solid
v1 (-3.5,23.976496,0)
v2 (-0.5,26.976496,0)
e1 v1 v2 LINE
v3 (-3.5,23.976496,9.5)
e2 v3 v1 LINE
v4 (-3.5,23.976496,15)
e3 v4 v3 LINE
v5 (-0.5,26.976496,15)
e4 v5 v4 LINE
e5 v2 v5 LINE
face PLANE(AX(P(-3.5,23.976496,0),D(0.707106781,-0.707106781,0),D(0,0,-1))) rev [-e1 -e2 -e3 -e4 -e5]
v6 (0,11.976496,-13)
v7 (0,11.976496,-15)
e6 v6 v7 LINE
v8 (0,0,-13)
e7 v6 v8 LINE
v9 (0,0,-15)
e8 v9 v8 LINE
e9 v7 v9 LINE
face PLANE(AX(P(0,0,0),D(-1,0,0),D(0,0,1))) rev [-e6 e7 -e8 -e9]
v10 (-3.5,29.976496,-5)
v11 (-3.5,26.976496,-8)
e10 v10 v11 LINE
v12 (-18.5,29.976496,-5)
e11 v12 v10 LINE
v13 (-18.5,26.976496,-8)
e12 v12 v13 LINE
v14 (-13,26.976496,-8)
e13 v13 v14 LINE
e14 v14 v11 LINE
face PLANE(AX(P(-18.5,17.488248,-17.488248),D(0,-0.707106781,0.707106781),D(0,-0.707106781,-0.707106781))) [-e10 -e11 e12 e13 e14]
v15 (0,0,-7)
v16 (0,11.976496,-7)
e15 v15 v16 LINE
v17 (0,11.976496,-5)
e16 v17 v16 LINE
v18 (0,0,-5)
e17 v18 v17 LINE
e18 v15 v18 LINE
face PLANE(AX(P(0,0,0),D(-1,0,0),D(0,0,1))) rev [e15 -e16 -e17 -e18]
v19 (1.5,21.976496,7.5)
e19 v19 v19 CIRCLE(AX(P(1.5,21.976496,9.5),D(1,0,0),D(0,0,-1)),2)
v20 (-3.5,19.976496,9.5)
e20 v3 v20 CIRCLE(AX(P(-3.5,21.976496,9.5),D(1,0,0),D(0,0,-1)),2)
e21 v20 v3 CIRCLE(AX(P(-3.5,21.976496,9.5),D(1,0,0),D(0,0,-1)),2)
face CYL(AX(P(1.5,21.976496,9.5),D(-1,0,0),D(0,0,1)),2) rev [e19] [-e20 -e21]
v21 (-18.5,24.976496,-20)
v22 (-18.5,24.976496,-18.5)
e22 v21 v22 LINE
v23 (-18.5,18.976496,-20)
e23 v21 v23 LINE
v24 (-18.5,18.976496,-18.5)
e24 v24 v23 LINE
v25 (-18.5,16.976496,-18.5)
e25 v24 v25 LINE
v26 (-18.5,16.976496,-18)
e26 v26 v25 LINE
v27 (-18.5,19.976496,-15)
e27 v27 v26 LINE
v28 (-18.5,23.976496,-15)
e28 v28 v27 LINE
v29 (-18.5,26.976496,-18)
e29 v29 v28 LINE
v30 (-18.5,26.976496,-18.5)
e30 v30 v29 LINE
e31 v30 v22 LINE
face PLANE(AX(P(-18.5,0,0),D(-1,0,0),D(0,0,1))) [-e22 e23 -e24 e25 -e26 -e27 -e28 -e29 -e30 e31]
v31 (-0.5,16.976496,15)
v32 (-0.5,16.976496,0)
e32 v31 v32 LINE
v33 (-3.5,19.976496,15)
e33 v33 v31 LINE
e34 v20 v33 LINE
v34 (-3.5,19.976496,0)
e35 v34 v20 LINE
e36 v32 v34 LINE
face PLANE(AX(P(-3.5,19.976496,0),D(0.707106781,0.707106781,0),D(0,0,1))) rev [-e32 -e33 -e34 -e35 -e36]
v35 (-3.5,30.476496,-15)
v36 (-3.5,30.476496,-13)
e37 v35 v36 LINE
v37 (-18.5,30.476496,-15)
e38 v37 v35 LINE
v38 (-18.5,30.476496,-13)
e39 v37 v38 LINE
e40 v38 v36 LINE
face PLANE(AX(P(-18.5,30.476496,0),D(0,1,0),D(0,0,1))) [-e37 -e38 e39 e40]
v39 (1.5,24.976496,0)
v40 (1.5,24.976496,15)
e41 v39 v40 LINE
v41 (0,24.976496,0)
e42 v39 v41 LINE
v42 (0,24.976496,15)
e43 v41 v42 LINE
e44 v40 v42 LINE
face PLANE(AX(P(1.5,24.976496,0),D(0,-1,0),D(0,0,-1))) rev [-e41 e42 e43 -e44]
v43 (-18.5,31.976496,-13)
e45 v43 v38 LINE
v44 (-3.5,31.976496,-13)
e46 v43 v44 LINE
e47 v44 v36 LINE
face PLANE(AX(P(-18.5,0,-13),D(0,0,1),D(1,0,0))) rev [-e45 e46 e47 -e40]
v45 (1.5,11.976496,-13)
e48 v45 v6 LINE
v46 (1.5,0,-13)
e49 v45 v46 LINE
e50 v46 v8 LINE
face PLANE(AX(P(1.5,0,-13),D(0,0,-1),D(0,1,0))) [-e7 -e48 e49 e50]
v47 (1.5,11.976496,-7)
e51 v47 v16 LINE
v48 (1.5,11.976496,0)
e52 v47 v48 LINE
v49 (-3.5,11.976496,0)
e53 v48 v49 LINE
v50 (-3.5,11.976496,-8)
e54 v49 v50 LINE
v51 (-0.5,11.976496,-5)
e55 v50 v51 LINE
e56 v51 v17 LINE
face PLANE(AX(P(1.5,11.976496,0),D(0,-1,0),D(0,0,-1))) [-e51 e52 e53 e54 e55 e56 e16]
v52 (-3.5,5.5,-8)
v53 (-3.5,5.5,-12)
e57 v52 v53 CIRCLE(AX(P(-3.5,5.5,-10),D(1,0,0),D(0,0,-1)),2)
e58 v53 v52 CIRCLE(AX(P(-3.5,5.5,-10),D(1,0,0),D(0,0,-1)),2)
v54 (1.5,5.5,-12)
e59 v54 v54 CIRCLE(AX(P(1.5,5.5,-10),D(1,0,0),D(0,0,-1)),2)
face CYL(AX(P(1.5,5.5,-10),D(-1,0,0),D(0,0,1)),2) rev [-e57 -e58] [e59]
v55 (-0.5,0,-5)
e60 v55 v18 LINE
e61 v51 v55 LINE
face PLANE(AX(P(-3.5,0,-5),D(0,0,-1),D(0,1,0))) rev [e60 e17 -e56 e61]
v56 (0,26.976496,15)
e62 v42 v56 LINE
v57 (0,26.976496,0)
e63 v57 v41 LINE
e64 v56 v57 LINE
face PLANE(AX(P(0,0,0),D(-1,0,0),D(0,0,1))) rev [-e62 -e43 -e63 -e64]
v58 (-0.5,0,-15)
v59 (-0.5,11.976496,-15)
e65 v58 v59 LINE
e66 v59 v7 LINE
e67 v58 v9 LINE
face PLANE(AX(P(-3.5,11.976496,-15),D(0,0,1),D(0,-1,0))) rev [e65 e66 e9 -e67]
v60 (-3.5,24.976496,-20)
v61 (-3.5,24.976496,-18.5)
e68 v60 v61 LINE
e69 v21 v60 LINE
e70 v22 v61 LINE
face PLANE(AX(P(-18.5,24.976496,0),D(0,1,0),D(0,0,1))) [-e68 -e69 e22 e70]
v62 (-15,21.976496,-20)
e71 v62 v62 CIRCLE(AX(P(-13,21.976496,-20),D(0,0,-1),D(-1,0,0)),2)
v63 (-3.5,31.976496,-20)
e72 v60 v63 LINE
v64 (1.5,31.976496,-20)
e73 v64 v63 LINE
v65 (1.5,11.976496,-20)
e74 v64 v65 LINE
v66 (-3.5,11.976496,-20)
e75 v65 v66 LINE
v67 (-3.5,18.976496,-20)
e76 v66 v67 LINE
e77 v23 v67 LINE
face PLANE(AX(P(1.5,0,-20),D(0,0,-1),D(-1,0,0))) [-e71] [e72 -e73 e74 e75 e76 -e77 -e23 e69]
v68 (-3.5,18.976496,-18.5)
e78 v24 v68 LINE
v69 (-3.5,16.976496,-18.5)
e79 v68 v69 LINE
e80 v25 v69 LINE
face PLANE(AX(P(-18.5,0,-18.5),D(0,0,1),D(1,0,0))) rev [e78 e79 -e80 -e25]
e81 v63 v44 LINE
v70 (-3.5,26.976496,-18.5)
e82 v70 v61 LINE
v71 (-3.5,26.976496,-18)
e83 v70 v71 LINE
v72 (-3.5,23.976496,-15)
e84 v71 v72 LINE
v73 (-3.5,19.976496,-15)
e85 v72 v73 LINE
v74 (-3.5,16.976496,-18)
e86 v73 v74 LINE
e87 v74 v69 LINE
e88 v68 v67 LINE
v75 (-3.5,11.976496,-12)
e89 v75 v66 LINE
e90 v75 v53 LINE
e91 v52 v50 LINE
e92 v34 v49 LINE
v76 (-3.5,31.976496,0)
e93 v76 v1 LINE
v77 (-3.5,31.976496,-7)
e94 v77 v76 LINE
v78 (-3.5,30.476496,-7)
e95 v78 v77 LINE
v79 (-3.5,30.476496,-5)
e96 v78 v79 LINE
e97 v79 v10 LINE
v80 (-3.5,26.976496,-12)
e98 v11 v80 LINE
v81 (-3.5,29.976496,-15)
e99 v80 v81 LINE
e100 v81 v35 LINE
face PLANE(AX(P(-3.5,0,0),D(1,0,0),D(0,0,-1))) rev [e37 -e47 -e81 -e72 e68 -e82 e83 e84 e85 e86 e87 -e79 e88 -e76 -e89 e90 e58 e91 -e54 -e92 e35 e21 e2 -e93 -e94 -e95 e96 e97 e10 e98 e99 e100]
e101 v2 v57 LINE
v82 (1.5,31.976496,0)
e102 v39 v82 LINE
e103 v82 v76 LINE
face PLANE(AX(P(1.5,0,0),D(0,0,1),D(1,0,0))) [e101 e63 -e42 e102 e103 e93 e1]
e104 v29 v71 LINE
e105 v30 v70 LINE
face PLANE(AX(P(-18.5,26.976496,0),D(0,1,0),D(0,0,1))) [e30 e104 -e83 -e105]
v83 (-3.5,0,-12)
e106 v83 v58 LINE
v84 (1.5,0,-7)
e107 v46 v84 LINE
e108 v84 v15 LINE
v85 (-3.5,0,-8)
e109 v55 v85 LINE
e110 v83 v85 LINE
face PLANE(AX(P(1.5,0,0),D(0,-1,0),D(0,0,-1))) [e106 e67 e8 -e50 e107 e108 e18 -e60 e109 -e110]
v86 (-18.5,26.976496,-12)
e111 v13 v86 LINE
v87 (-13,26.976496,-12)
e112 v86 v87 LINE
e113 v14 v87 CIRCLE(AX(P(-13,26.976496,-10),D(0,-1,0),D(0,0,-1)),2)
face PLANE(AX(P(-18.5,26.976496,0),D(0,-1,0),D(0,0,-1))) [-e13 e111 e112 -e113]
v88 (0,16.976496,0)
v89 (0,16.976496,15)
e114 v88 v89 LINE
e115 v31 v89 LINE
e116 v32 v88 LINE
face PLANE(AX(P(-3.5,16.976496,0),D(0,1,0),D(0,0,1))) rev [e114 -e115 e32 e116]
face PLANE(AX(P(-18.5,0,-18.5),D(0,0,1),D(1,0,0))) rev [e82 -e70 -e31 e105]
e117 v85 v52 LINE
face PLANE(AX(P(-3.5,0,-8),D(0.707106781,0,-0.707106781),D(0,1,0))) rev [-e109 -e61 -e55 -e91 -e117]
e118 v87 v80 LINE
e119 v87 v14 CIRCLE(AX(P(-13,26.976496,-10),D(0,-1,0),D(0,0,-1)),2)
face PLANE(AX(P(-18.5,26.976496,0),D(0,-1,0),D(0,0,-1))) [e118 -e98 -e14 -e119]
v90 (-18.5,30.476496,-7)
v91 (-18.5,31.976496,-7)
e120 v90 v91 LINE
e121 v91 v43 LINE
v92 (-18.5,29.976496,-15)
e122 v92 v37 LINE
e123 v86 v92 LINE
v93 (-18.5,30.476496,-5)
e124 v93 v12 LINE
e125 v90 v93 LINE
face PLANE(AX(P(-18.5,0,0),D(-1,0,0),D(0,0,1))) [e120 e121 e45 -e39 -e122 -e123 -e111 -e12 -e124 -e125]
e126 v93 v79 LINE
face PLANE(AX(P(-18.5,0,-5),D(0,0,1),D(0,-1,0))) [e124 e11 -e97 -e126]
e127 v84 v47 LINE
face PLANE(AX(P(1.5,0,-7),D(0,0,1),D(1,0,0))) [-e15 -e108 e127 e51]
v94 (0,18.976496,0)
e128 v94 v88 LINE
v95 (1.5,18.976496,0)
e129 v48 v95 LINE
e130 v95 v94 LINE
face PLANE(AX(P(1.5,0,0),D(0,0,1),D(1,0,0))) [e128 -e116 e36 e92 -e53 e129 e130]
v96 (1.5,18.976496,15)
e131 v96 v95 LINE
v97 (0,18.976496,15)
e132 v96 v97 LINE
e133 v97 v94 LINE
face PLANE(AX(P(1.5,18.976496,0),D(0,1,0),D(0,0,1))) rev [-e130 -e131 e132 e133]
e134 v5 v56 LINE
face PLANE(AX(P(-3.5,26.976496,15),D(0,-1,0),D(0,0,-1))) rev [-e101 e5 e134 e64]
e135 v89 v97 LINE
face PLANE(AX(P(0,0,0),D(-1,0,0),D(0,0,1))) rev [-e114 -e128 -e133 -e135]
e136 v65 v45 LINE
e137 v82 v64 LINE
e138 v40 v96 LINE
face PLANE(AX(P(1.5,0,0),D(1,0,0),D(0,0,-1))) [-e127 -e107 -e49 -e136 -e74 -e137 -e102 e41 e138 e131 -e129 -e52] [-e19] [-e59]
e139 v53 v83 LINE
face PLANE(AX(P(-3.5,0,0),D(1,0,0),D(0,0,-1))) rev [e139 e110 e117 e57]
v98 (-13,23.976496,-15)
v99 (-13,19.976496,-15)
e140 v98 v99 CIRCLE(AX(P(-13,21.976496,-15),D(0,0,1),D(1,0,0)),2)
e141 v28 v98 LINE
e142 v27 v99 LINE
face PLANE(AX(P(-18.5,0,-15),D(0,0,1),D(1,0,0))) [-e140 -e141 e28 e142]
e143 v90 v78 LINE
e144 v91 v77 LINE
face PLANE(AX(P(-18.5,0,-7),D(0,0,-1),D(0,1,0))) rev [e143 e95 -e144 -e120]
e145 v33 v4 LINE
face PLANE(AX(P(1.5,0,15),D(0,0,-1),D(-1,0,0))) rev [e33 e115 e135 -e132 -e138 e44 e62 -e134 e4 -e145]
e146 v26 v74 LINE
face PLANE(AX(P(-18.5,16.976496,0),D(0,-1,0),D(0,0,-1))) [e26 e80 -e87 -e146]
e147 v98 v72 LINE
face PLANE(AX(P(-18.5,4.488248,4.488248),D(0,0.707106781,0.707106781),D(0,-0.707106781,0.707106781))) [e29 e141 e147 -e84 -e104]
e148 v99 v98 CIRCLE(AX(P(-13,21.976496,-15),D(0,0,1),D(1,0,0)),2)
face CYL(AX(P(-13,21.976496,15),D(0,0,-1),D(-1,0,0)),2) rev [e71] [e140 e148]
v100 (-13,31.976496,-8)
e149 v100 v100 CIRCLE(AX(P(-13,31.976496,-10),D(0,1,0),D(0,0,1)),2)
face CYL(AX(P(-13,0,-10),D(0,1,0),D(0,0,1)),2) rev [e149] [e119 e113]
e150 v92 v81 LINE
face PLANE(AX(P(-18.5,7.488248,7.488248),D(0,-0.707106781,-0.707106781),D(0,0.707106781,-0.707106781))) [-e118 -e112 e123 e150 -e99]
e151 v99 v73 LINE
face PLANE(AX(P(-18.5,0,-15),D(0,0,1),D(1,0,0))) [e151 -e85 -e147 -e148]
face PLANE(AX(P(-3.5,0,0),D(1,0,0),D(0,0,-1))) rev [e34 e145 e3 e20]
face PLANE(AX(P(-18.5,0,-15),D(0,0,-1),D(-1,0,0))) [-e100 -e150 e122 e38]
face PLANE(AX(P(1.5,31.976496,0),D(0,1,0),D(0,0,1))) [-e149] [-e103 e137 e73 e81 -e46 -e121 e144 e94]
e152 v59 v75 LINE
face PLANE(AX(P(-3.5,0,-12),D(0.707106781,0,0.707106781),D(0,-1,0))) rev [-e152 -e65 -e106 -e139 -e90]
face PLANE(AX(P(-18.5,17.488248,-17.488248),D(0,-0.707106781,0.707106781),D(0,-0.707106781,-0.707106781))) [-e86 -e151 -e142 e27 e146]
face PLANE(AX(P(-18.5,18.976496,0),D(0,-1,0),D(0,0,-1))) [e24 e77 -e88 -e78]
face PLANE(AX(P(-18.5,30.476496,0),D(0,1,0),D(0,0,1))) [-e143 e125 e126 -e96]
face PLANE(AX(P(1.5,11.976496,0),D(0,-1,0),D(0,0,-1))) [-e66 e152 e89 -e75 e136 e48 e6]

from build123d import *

# Parameters (mm, degrees)
SKETCH1_W               = 20
SKETCH1_H               = 20
SKETCH1_W_2             = 15
SKETCH1_H_2             = 6
SKETCH1_R               = 2
SKETCH1_W_3             = 6
SKETCH1_H_3             = 11.976495928
BOSS_EXTRUDE2_DEPTH     = 1.5
BOSS_EXTRUDE3_DEPTH     = 3.5
SKETCH3_W               = 10
SKETCH3_H               = 11.976495928
SKETCH3_W_2             = 15
SKETCH3_H_2             = 10
BOSS_EXTRUDE4_DEPTH     = 3.5
CUT_EXTRUDE1_DEPTH      = 38.878044984
CUT_EXTRUDE1_DEPTH_BACK = 38.878044984
SKETCH5_R               = 2
SKETCH6_W               = 1.5
SKETCH6_H               = 6
SKETCH6_W_2             = 6
SKETCH6_H_2             = 1.5
BOSS_EXTRUDE6_DEPTH     = 15
CHAMFER1_SIZE           = 3
CUT_EXTRUDE4_DEPTH      = 43.008883487
CUT_EXTRUDE4_DEPTH_BACK = 43.008883487
SKETCH7_R               = 2
CUT_EXTRUDE5_DEPTH      = 51.889549928
CUT_EXTRUDE5_DEPTH_BACK = 51.889549928
SKETCH8_R               = 2


with BuildPart() as part:
    # Sketch1 → Boss-Extrude2 (new body)
    # profile 1 of 3: a face of its own
    with BuildSketch(Plane(origin=(0, 0, 0), x_dir=(0, 0, -1), z_dir=(1, 0, 0))):
        with Locations((10, 21.976495928)):
            Rectangle(SKETCH1_W, SKETCH1_H)
    # profile 2 of 3: a face of its own
    with BuildSketch(Plane(origin=(0, 0, 0), x_dir=(0, 0, -1), z_dir=(1, 0, 0))):
        with Locations((-7.5, 21.976495928)):
            Rectangle(SKETCH1_W_2, SKETCH1_H_2)
        with Locations((-9.5, 21.976495928)):
            Circle(SKETCH1_R, mode=Mode.SUBTRACT)
    # profile 3 of 3: a face of its own
    with BuildSketch(Plane(origin=(0, 0, 0), x_dir=(0, 0, -1), z_dir=(1, 0, 0))):
        with Locations((10, 5.988247964)):
            Rectangle(SKETCH1_W_3, SKETCH1_H_3)
        with Locations((10, 5.5)):
            Circle(SKETCH1_R, mode=Mode.SUBTRACT)
    extrude(amount=BOSS_EXTRUDE2_DEPTH)

    # Sketch2 → Boss-Extrude3 (add)
    with BuildSketch(Plane.ZY):
        Polygon((-20, 31.976495928), (0, 31.976495928), (0, 24.976495928), (0, 11.976495928), (-20, 11.976495928), align=None)
    extrude(amount=BOSS_EXTRUDE3_DEPTH)

    # Sketch3 → Boss-Extrude4 (add)
    with BuildSketch(Plane.ZY):
        with Locations((-10, 5.988247964)):
            Rectangle(SKETCH3_W, SKETCH3_H)
        with Locations((7.5, 21.976495928)):
            Rectangle(SKETCH3_W_2, SKETCH3_H_2)
    extrude(amount=BOSS_EXTRUDE4_DEPTH)

    # Sketch5 → Cut-Extrude1 (cut, two sides: drawn at the far end of the back side and taken through both)
    with BuildSketch(Plane(origin=(0, 0, 0), x_dir=(0, 0, -1), z_dir=(1, 0, 0)).offset(-CUT_EXTRUDE1_DEPTH_BACK)):
        with Locations((-9.5, 21.976495928)):
            Circle(SKETCH5_R)
        with Locations((10, 5.5)):
            Circle(SKETCH5_R)
    extrude(amount=CUT_EXTRUDE1_DEPTH + CUT_EXTRUDE1_DEPTH_BACK, mode=Mode.SUBTRACT)

    # Sketch6 → Boss-Extrude6 (add)
    with BuildSketch(Plane.ZY.offset(3.5)):
        Polygon((-18.5, 26.976495928), (-18.5, 24.976495928), (-18.5, 18.976495928), (-18.5, 16.976495928), (-18, 16.976495928), (-15, 19.976495928), (-15, 23.976495928), (-18, 26.976495928), align=None)
        with Locations((-19.25, 21.976495928)):
            Rectangle(SKETCH6_W, SKETCH6_H)
        Polygon((-5, 29.976495928), (-5, 30.476495928), (-7, 30.476495928), (-13, 30.476495928), (-15, 30.476495928), (-15, 29.976495928), (-12, 26.976495928), (-8, 26.976495928), align=None)
        with Locations((-10, 31.226495928)):
            Rectangle(SKETCH6_W_2, SKETCH6_H_2)
    extrude(amount=BOSS_EXTRUDE6_DEPTH)

    # Chamfer1
    chamfer1_edges = [part.edges().sort_by_distance(p)[0] for p in [
        (-3.5, 5.988247964, -15),
        (-3.5, 5.988247964, -5),
        (-3.5, 16.976495928, 7.5),
        (-3.5, 26.976495928, 7.5),
    ]]
    chamfer(chamfer1_edges, length=CHAMFER1_SIZE - 0.0001)  # a hair under: the kernel refuses the full size

    # Sketch7 → Cut-Extrude4 (cut, two sides: drawn at the far end of the back side and taken through both)
    with BuildSketch(Plane(origin=(0, 31.976495928, 0), x_dir=(1, 0, 0), z_dir=(0, 1, 0)).offset(-CUT_EXTRUDE4_DEPTH_BACK)):
        with Locations(Location((-13, 10, 0), (0, 0, 270))):
            Circle(SKETCH7_R)
    extrude(amount=CUT_EXTRUDE4_DEPTH + CUT_EXTRUDE4_DEPTH_BACK, mode=Mode.SUBTRACT)

    # Sketch8 → Cut-Extrude5 (cut, two sides: drawn at the far end of the back side and taken through both)
    with BuildSketch(Plane(origin=(0, 0, -20), x_dir=(-1, 0, 0), z_dir=(0, 0, -1)).offset(-CUT_EXTRUDE5_DEPTH_BACK)):
        with Locations((13, 21.976495928)):
            Circle(SKETCH8_R)
    extrude(amount=CUT_EXTRUDE5_DEPTH + CUT_EXTRUDE5_DEPTH_BACK, mode=Mode.SUBTRACT)


solid = part.part
